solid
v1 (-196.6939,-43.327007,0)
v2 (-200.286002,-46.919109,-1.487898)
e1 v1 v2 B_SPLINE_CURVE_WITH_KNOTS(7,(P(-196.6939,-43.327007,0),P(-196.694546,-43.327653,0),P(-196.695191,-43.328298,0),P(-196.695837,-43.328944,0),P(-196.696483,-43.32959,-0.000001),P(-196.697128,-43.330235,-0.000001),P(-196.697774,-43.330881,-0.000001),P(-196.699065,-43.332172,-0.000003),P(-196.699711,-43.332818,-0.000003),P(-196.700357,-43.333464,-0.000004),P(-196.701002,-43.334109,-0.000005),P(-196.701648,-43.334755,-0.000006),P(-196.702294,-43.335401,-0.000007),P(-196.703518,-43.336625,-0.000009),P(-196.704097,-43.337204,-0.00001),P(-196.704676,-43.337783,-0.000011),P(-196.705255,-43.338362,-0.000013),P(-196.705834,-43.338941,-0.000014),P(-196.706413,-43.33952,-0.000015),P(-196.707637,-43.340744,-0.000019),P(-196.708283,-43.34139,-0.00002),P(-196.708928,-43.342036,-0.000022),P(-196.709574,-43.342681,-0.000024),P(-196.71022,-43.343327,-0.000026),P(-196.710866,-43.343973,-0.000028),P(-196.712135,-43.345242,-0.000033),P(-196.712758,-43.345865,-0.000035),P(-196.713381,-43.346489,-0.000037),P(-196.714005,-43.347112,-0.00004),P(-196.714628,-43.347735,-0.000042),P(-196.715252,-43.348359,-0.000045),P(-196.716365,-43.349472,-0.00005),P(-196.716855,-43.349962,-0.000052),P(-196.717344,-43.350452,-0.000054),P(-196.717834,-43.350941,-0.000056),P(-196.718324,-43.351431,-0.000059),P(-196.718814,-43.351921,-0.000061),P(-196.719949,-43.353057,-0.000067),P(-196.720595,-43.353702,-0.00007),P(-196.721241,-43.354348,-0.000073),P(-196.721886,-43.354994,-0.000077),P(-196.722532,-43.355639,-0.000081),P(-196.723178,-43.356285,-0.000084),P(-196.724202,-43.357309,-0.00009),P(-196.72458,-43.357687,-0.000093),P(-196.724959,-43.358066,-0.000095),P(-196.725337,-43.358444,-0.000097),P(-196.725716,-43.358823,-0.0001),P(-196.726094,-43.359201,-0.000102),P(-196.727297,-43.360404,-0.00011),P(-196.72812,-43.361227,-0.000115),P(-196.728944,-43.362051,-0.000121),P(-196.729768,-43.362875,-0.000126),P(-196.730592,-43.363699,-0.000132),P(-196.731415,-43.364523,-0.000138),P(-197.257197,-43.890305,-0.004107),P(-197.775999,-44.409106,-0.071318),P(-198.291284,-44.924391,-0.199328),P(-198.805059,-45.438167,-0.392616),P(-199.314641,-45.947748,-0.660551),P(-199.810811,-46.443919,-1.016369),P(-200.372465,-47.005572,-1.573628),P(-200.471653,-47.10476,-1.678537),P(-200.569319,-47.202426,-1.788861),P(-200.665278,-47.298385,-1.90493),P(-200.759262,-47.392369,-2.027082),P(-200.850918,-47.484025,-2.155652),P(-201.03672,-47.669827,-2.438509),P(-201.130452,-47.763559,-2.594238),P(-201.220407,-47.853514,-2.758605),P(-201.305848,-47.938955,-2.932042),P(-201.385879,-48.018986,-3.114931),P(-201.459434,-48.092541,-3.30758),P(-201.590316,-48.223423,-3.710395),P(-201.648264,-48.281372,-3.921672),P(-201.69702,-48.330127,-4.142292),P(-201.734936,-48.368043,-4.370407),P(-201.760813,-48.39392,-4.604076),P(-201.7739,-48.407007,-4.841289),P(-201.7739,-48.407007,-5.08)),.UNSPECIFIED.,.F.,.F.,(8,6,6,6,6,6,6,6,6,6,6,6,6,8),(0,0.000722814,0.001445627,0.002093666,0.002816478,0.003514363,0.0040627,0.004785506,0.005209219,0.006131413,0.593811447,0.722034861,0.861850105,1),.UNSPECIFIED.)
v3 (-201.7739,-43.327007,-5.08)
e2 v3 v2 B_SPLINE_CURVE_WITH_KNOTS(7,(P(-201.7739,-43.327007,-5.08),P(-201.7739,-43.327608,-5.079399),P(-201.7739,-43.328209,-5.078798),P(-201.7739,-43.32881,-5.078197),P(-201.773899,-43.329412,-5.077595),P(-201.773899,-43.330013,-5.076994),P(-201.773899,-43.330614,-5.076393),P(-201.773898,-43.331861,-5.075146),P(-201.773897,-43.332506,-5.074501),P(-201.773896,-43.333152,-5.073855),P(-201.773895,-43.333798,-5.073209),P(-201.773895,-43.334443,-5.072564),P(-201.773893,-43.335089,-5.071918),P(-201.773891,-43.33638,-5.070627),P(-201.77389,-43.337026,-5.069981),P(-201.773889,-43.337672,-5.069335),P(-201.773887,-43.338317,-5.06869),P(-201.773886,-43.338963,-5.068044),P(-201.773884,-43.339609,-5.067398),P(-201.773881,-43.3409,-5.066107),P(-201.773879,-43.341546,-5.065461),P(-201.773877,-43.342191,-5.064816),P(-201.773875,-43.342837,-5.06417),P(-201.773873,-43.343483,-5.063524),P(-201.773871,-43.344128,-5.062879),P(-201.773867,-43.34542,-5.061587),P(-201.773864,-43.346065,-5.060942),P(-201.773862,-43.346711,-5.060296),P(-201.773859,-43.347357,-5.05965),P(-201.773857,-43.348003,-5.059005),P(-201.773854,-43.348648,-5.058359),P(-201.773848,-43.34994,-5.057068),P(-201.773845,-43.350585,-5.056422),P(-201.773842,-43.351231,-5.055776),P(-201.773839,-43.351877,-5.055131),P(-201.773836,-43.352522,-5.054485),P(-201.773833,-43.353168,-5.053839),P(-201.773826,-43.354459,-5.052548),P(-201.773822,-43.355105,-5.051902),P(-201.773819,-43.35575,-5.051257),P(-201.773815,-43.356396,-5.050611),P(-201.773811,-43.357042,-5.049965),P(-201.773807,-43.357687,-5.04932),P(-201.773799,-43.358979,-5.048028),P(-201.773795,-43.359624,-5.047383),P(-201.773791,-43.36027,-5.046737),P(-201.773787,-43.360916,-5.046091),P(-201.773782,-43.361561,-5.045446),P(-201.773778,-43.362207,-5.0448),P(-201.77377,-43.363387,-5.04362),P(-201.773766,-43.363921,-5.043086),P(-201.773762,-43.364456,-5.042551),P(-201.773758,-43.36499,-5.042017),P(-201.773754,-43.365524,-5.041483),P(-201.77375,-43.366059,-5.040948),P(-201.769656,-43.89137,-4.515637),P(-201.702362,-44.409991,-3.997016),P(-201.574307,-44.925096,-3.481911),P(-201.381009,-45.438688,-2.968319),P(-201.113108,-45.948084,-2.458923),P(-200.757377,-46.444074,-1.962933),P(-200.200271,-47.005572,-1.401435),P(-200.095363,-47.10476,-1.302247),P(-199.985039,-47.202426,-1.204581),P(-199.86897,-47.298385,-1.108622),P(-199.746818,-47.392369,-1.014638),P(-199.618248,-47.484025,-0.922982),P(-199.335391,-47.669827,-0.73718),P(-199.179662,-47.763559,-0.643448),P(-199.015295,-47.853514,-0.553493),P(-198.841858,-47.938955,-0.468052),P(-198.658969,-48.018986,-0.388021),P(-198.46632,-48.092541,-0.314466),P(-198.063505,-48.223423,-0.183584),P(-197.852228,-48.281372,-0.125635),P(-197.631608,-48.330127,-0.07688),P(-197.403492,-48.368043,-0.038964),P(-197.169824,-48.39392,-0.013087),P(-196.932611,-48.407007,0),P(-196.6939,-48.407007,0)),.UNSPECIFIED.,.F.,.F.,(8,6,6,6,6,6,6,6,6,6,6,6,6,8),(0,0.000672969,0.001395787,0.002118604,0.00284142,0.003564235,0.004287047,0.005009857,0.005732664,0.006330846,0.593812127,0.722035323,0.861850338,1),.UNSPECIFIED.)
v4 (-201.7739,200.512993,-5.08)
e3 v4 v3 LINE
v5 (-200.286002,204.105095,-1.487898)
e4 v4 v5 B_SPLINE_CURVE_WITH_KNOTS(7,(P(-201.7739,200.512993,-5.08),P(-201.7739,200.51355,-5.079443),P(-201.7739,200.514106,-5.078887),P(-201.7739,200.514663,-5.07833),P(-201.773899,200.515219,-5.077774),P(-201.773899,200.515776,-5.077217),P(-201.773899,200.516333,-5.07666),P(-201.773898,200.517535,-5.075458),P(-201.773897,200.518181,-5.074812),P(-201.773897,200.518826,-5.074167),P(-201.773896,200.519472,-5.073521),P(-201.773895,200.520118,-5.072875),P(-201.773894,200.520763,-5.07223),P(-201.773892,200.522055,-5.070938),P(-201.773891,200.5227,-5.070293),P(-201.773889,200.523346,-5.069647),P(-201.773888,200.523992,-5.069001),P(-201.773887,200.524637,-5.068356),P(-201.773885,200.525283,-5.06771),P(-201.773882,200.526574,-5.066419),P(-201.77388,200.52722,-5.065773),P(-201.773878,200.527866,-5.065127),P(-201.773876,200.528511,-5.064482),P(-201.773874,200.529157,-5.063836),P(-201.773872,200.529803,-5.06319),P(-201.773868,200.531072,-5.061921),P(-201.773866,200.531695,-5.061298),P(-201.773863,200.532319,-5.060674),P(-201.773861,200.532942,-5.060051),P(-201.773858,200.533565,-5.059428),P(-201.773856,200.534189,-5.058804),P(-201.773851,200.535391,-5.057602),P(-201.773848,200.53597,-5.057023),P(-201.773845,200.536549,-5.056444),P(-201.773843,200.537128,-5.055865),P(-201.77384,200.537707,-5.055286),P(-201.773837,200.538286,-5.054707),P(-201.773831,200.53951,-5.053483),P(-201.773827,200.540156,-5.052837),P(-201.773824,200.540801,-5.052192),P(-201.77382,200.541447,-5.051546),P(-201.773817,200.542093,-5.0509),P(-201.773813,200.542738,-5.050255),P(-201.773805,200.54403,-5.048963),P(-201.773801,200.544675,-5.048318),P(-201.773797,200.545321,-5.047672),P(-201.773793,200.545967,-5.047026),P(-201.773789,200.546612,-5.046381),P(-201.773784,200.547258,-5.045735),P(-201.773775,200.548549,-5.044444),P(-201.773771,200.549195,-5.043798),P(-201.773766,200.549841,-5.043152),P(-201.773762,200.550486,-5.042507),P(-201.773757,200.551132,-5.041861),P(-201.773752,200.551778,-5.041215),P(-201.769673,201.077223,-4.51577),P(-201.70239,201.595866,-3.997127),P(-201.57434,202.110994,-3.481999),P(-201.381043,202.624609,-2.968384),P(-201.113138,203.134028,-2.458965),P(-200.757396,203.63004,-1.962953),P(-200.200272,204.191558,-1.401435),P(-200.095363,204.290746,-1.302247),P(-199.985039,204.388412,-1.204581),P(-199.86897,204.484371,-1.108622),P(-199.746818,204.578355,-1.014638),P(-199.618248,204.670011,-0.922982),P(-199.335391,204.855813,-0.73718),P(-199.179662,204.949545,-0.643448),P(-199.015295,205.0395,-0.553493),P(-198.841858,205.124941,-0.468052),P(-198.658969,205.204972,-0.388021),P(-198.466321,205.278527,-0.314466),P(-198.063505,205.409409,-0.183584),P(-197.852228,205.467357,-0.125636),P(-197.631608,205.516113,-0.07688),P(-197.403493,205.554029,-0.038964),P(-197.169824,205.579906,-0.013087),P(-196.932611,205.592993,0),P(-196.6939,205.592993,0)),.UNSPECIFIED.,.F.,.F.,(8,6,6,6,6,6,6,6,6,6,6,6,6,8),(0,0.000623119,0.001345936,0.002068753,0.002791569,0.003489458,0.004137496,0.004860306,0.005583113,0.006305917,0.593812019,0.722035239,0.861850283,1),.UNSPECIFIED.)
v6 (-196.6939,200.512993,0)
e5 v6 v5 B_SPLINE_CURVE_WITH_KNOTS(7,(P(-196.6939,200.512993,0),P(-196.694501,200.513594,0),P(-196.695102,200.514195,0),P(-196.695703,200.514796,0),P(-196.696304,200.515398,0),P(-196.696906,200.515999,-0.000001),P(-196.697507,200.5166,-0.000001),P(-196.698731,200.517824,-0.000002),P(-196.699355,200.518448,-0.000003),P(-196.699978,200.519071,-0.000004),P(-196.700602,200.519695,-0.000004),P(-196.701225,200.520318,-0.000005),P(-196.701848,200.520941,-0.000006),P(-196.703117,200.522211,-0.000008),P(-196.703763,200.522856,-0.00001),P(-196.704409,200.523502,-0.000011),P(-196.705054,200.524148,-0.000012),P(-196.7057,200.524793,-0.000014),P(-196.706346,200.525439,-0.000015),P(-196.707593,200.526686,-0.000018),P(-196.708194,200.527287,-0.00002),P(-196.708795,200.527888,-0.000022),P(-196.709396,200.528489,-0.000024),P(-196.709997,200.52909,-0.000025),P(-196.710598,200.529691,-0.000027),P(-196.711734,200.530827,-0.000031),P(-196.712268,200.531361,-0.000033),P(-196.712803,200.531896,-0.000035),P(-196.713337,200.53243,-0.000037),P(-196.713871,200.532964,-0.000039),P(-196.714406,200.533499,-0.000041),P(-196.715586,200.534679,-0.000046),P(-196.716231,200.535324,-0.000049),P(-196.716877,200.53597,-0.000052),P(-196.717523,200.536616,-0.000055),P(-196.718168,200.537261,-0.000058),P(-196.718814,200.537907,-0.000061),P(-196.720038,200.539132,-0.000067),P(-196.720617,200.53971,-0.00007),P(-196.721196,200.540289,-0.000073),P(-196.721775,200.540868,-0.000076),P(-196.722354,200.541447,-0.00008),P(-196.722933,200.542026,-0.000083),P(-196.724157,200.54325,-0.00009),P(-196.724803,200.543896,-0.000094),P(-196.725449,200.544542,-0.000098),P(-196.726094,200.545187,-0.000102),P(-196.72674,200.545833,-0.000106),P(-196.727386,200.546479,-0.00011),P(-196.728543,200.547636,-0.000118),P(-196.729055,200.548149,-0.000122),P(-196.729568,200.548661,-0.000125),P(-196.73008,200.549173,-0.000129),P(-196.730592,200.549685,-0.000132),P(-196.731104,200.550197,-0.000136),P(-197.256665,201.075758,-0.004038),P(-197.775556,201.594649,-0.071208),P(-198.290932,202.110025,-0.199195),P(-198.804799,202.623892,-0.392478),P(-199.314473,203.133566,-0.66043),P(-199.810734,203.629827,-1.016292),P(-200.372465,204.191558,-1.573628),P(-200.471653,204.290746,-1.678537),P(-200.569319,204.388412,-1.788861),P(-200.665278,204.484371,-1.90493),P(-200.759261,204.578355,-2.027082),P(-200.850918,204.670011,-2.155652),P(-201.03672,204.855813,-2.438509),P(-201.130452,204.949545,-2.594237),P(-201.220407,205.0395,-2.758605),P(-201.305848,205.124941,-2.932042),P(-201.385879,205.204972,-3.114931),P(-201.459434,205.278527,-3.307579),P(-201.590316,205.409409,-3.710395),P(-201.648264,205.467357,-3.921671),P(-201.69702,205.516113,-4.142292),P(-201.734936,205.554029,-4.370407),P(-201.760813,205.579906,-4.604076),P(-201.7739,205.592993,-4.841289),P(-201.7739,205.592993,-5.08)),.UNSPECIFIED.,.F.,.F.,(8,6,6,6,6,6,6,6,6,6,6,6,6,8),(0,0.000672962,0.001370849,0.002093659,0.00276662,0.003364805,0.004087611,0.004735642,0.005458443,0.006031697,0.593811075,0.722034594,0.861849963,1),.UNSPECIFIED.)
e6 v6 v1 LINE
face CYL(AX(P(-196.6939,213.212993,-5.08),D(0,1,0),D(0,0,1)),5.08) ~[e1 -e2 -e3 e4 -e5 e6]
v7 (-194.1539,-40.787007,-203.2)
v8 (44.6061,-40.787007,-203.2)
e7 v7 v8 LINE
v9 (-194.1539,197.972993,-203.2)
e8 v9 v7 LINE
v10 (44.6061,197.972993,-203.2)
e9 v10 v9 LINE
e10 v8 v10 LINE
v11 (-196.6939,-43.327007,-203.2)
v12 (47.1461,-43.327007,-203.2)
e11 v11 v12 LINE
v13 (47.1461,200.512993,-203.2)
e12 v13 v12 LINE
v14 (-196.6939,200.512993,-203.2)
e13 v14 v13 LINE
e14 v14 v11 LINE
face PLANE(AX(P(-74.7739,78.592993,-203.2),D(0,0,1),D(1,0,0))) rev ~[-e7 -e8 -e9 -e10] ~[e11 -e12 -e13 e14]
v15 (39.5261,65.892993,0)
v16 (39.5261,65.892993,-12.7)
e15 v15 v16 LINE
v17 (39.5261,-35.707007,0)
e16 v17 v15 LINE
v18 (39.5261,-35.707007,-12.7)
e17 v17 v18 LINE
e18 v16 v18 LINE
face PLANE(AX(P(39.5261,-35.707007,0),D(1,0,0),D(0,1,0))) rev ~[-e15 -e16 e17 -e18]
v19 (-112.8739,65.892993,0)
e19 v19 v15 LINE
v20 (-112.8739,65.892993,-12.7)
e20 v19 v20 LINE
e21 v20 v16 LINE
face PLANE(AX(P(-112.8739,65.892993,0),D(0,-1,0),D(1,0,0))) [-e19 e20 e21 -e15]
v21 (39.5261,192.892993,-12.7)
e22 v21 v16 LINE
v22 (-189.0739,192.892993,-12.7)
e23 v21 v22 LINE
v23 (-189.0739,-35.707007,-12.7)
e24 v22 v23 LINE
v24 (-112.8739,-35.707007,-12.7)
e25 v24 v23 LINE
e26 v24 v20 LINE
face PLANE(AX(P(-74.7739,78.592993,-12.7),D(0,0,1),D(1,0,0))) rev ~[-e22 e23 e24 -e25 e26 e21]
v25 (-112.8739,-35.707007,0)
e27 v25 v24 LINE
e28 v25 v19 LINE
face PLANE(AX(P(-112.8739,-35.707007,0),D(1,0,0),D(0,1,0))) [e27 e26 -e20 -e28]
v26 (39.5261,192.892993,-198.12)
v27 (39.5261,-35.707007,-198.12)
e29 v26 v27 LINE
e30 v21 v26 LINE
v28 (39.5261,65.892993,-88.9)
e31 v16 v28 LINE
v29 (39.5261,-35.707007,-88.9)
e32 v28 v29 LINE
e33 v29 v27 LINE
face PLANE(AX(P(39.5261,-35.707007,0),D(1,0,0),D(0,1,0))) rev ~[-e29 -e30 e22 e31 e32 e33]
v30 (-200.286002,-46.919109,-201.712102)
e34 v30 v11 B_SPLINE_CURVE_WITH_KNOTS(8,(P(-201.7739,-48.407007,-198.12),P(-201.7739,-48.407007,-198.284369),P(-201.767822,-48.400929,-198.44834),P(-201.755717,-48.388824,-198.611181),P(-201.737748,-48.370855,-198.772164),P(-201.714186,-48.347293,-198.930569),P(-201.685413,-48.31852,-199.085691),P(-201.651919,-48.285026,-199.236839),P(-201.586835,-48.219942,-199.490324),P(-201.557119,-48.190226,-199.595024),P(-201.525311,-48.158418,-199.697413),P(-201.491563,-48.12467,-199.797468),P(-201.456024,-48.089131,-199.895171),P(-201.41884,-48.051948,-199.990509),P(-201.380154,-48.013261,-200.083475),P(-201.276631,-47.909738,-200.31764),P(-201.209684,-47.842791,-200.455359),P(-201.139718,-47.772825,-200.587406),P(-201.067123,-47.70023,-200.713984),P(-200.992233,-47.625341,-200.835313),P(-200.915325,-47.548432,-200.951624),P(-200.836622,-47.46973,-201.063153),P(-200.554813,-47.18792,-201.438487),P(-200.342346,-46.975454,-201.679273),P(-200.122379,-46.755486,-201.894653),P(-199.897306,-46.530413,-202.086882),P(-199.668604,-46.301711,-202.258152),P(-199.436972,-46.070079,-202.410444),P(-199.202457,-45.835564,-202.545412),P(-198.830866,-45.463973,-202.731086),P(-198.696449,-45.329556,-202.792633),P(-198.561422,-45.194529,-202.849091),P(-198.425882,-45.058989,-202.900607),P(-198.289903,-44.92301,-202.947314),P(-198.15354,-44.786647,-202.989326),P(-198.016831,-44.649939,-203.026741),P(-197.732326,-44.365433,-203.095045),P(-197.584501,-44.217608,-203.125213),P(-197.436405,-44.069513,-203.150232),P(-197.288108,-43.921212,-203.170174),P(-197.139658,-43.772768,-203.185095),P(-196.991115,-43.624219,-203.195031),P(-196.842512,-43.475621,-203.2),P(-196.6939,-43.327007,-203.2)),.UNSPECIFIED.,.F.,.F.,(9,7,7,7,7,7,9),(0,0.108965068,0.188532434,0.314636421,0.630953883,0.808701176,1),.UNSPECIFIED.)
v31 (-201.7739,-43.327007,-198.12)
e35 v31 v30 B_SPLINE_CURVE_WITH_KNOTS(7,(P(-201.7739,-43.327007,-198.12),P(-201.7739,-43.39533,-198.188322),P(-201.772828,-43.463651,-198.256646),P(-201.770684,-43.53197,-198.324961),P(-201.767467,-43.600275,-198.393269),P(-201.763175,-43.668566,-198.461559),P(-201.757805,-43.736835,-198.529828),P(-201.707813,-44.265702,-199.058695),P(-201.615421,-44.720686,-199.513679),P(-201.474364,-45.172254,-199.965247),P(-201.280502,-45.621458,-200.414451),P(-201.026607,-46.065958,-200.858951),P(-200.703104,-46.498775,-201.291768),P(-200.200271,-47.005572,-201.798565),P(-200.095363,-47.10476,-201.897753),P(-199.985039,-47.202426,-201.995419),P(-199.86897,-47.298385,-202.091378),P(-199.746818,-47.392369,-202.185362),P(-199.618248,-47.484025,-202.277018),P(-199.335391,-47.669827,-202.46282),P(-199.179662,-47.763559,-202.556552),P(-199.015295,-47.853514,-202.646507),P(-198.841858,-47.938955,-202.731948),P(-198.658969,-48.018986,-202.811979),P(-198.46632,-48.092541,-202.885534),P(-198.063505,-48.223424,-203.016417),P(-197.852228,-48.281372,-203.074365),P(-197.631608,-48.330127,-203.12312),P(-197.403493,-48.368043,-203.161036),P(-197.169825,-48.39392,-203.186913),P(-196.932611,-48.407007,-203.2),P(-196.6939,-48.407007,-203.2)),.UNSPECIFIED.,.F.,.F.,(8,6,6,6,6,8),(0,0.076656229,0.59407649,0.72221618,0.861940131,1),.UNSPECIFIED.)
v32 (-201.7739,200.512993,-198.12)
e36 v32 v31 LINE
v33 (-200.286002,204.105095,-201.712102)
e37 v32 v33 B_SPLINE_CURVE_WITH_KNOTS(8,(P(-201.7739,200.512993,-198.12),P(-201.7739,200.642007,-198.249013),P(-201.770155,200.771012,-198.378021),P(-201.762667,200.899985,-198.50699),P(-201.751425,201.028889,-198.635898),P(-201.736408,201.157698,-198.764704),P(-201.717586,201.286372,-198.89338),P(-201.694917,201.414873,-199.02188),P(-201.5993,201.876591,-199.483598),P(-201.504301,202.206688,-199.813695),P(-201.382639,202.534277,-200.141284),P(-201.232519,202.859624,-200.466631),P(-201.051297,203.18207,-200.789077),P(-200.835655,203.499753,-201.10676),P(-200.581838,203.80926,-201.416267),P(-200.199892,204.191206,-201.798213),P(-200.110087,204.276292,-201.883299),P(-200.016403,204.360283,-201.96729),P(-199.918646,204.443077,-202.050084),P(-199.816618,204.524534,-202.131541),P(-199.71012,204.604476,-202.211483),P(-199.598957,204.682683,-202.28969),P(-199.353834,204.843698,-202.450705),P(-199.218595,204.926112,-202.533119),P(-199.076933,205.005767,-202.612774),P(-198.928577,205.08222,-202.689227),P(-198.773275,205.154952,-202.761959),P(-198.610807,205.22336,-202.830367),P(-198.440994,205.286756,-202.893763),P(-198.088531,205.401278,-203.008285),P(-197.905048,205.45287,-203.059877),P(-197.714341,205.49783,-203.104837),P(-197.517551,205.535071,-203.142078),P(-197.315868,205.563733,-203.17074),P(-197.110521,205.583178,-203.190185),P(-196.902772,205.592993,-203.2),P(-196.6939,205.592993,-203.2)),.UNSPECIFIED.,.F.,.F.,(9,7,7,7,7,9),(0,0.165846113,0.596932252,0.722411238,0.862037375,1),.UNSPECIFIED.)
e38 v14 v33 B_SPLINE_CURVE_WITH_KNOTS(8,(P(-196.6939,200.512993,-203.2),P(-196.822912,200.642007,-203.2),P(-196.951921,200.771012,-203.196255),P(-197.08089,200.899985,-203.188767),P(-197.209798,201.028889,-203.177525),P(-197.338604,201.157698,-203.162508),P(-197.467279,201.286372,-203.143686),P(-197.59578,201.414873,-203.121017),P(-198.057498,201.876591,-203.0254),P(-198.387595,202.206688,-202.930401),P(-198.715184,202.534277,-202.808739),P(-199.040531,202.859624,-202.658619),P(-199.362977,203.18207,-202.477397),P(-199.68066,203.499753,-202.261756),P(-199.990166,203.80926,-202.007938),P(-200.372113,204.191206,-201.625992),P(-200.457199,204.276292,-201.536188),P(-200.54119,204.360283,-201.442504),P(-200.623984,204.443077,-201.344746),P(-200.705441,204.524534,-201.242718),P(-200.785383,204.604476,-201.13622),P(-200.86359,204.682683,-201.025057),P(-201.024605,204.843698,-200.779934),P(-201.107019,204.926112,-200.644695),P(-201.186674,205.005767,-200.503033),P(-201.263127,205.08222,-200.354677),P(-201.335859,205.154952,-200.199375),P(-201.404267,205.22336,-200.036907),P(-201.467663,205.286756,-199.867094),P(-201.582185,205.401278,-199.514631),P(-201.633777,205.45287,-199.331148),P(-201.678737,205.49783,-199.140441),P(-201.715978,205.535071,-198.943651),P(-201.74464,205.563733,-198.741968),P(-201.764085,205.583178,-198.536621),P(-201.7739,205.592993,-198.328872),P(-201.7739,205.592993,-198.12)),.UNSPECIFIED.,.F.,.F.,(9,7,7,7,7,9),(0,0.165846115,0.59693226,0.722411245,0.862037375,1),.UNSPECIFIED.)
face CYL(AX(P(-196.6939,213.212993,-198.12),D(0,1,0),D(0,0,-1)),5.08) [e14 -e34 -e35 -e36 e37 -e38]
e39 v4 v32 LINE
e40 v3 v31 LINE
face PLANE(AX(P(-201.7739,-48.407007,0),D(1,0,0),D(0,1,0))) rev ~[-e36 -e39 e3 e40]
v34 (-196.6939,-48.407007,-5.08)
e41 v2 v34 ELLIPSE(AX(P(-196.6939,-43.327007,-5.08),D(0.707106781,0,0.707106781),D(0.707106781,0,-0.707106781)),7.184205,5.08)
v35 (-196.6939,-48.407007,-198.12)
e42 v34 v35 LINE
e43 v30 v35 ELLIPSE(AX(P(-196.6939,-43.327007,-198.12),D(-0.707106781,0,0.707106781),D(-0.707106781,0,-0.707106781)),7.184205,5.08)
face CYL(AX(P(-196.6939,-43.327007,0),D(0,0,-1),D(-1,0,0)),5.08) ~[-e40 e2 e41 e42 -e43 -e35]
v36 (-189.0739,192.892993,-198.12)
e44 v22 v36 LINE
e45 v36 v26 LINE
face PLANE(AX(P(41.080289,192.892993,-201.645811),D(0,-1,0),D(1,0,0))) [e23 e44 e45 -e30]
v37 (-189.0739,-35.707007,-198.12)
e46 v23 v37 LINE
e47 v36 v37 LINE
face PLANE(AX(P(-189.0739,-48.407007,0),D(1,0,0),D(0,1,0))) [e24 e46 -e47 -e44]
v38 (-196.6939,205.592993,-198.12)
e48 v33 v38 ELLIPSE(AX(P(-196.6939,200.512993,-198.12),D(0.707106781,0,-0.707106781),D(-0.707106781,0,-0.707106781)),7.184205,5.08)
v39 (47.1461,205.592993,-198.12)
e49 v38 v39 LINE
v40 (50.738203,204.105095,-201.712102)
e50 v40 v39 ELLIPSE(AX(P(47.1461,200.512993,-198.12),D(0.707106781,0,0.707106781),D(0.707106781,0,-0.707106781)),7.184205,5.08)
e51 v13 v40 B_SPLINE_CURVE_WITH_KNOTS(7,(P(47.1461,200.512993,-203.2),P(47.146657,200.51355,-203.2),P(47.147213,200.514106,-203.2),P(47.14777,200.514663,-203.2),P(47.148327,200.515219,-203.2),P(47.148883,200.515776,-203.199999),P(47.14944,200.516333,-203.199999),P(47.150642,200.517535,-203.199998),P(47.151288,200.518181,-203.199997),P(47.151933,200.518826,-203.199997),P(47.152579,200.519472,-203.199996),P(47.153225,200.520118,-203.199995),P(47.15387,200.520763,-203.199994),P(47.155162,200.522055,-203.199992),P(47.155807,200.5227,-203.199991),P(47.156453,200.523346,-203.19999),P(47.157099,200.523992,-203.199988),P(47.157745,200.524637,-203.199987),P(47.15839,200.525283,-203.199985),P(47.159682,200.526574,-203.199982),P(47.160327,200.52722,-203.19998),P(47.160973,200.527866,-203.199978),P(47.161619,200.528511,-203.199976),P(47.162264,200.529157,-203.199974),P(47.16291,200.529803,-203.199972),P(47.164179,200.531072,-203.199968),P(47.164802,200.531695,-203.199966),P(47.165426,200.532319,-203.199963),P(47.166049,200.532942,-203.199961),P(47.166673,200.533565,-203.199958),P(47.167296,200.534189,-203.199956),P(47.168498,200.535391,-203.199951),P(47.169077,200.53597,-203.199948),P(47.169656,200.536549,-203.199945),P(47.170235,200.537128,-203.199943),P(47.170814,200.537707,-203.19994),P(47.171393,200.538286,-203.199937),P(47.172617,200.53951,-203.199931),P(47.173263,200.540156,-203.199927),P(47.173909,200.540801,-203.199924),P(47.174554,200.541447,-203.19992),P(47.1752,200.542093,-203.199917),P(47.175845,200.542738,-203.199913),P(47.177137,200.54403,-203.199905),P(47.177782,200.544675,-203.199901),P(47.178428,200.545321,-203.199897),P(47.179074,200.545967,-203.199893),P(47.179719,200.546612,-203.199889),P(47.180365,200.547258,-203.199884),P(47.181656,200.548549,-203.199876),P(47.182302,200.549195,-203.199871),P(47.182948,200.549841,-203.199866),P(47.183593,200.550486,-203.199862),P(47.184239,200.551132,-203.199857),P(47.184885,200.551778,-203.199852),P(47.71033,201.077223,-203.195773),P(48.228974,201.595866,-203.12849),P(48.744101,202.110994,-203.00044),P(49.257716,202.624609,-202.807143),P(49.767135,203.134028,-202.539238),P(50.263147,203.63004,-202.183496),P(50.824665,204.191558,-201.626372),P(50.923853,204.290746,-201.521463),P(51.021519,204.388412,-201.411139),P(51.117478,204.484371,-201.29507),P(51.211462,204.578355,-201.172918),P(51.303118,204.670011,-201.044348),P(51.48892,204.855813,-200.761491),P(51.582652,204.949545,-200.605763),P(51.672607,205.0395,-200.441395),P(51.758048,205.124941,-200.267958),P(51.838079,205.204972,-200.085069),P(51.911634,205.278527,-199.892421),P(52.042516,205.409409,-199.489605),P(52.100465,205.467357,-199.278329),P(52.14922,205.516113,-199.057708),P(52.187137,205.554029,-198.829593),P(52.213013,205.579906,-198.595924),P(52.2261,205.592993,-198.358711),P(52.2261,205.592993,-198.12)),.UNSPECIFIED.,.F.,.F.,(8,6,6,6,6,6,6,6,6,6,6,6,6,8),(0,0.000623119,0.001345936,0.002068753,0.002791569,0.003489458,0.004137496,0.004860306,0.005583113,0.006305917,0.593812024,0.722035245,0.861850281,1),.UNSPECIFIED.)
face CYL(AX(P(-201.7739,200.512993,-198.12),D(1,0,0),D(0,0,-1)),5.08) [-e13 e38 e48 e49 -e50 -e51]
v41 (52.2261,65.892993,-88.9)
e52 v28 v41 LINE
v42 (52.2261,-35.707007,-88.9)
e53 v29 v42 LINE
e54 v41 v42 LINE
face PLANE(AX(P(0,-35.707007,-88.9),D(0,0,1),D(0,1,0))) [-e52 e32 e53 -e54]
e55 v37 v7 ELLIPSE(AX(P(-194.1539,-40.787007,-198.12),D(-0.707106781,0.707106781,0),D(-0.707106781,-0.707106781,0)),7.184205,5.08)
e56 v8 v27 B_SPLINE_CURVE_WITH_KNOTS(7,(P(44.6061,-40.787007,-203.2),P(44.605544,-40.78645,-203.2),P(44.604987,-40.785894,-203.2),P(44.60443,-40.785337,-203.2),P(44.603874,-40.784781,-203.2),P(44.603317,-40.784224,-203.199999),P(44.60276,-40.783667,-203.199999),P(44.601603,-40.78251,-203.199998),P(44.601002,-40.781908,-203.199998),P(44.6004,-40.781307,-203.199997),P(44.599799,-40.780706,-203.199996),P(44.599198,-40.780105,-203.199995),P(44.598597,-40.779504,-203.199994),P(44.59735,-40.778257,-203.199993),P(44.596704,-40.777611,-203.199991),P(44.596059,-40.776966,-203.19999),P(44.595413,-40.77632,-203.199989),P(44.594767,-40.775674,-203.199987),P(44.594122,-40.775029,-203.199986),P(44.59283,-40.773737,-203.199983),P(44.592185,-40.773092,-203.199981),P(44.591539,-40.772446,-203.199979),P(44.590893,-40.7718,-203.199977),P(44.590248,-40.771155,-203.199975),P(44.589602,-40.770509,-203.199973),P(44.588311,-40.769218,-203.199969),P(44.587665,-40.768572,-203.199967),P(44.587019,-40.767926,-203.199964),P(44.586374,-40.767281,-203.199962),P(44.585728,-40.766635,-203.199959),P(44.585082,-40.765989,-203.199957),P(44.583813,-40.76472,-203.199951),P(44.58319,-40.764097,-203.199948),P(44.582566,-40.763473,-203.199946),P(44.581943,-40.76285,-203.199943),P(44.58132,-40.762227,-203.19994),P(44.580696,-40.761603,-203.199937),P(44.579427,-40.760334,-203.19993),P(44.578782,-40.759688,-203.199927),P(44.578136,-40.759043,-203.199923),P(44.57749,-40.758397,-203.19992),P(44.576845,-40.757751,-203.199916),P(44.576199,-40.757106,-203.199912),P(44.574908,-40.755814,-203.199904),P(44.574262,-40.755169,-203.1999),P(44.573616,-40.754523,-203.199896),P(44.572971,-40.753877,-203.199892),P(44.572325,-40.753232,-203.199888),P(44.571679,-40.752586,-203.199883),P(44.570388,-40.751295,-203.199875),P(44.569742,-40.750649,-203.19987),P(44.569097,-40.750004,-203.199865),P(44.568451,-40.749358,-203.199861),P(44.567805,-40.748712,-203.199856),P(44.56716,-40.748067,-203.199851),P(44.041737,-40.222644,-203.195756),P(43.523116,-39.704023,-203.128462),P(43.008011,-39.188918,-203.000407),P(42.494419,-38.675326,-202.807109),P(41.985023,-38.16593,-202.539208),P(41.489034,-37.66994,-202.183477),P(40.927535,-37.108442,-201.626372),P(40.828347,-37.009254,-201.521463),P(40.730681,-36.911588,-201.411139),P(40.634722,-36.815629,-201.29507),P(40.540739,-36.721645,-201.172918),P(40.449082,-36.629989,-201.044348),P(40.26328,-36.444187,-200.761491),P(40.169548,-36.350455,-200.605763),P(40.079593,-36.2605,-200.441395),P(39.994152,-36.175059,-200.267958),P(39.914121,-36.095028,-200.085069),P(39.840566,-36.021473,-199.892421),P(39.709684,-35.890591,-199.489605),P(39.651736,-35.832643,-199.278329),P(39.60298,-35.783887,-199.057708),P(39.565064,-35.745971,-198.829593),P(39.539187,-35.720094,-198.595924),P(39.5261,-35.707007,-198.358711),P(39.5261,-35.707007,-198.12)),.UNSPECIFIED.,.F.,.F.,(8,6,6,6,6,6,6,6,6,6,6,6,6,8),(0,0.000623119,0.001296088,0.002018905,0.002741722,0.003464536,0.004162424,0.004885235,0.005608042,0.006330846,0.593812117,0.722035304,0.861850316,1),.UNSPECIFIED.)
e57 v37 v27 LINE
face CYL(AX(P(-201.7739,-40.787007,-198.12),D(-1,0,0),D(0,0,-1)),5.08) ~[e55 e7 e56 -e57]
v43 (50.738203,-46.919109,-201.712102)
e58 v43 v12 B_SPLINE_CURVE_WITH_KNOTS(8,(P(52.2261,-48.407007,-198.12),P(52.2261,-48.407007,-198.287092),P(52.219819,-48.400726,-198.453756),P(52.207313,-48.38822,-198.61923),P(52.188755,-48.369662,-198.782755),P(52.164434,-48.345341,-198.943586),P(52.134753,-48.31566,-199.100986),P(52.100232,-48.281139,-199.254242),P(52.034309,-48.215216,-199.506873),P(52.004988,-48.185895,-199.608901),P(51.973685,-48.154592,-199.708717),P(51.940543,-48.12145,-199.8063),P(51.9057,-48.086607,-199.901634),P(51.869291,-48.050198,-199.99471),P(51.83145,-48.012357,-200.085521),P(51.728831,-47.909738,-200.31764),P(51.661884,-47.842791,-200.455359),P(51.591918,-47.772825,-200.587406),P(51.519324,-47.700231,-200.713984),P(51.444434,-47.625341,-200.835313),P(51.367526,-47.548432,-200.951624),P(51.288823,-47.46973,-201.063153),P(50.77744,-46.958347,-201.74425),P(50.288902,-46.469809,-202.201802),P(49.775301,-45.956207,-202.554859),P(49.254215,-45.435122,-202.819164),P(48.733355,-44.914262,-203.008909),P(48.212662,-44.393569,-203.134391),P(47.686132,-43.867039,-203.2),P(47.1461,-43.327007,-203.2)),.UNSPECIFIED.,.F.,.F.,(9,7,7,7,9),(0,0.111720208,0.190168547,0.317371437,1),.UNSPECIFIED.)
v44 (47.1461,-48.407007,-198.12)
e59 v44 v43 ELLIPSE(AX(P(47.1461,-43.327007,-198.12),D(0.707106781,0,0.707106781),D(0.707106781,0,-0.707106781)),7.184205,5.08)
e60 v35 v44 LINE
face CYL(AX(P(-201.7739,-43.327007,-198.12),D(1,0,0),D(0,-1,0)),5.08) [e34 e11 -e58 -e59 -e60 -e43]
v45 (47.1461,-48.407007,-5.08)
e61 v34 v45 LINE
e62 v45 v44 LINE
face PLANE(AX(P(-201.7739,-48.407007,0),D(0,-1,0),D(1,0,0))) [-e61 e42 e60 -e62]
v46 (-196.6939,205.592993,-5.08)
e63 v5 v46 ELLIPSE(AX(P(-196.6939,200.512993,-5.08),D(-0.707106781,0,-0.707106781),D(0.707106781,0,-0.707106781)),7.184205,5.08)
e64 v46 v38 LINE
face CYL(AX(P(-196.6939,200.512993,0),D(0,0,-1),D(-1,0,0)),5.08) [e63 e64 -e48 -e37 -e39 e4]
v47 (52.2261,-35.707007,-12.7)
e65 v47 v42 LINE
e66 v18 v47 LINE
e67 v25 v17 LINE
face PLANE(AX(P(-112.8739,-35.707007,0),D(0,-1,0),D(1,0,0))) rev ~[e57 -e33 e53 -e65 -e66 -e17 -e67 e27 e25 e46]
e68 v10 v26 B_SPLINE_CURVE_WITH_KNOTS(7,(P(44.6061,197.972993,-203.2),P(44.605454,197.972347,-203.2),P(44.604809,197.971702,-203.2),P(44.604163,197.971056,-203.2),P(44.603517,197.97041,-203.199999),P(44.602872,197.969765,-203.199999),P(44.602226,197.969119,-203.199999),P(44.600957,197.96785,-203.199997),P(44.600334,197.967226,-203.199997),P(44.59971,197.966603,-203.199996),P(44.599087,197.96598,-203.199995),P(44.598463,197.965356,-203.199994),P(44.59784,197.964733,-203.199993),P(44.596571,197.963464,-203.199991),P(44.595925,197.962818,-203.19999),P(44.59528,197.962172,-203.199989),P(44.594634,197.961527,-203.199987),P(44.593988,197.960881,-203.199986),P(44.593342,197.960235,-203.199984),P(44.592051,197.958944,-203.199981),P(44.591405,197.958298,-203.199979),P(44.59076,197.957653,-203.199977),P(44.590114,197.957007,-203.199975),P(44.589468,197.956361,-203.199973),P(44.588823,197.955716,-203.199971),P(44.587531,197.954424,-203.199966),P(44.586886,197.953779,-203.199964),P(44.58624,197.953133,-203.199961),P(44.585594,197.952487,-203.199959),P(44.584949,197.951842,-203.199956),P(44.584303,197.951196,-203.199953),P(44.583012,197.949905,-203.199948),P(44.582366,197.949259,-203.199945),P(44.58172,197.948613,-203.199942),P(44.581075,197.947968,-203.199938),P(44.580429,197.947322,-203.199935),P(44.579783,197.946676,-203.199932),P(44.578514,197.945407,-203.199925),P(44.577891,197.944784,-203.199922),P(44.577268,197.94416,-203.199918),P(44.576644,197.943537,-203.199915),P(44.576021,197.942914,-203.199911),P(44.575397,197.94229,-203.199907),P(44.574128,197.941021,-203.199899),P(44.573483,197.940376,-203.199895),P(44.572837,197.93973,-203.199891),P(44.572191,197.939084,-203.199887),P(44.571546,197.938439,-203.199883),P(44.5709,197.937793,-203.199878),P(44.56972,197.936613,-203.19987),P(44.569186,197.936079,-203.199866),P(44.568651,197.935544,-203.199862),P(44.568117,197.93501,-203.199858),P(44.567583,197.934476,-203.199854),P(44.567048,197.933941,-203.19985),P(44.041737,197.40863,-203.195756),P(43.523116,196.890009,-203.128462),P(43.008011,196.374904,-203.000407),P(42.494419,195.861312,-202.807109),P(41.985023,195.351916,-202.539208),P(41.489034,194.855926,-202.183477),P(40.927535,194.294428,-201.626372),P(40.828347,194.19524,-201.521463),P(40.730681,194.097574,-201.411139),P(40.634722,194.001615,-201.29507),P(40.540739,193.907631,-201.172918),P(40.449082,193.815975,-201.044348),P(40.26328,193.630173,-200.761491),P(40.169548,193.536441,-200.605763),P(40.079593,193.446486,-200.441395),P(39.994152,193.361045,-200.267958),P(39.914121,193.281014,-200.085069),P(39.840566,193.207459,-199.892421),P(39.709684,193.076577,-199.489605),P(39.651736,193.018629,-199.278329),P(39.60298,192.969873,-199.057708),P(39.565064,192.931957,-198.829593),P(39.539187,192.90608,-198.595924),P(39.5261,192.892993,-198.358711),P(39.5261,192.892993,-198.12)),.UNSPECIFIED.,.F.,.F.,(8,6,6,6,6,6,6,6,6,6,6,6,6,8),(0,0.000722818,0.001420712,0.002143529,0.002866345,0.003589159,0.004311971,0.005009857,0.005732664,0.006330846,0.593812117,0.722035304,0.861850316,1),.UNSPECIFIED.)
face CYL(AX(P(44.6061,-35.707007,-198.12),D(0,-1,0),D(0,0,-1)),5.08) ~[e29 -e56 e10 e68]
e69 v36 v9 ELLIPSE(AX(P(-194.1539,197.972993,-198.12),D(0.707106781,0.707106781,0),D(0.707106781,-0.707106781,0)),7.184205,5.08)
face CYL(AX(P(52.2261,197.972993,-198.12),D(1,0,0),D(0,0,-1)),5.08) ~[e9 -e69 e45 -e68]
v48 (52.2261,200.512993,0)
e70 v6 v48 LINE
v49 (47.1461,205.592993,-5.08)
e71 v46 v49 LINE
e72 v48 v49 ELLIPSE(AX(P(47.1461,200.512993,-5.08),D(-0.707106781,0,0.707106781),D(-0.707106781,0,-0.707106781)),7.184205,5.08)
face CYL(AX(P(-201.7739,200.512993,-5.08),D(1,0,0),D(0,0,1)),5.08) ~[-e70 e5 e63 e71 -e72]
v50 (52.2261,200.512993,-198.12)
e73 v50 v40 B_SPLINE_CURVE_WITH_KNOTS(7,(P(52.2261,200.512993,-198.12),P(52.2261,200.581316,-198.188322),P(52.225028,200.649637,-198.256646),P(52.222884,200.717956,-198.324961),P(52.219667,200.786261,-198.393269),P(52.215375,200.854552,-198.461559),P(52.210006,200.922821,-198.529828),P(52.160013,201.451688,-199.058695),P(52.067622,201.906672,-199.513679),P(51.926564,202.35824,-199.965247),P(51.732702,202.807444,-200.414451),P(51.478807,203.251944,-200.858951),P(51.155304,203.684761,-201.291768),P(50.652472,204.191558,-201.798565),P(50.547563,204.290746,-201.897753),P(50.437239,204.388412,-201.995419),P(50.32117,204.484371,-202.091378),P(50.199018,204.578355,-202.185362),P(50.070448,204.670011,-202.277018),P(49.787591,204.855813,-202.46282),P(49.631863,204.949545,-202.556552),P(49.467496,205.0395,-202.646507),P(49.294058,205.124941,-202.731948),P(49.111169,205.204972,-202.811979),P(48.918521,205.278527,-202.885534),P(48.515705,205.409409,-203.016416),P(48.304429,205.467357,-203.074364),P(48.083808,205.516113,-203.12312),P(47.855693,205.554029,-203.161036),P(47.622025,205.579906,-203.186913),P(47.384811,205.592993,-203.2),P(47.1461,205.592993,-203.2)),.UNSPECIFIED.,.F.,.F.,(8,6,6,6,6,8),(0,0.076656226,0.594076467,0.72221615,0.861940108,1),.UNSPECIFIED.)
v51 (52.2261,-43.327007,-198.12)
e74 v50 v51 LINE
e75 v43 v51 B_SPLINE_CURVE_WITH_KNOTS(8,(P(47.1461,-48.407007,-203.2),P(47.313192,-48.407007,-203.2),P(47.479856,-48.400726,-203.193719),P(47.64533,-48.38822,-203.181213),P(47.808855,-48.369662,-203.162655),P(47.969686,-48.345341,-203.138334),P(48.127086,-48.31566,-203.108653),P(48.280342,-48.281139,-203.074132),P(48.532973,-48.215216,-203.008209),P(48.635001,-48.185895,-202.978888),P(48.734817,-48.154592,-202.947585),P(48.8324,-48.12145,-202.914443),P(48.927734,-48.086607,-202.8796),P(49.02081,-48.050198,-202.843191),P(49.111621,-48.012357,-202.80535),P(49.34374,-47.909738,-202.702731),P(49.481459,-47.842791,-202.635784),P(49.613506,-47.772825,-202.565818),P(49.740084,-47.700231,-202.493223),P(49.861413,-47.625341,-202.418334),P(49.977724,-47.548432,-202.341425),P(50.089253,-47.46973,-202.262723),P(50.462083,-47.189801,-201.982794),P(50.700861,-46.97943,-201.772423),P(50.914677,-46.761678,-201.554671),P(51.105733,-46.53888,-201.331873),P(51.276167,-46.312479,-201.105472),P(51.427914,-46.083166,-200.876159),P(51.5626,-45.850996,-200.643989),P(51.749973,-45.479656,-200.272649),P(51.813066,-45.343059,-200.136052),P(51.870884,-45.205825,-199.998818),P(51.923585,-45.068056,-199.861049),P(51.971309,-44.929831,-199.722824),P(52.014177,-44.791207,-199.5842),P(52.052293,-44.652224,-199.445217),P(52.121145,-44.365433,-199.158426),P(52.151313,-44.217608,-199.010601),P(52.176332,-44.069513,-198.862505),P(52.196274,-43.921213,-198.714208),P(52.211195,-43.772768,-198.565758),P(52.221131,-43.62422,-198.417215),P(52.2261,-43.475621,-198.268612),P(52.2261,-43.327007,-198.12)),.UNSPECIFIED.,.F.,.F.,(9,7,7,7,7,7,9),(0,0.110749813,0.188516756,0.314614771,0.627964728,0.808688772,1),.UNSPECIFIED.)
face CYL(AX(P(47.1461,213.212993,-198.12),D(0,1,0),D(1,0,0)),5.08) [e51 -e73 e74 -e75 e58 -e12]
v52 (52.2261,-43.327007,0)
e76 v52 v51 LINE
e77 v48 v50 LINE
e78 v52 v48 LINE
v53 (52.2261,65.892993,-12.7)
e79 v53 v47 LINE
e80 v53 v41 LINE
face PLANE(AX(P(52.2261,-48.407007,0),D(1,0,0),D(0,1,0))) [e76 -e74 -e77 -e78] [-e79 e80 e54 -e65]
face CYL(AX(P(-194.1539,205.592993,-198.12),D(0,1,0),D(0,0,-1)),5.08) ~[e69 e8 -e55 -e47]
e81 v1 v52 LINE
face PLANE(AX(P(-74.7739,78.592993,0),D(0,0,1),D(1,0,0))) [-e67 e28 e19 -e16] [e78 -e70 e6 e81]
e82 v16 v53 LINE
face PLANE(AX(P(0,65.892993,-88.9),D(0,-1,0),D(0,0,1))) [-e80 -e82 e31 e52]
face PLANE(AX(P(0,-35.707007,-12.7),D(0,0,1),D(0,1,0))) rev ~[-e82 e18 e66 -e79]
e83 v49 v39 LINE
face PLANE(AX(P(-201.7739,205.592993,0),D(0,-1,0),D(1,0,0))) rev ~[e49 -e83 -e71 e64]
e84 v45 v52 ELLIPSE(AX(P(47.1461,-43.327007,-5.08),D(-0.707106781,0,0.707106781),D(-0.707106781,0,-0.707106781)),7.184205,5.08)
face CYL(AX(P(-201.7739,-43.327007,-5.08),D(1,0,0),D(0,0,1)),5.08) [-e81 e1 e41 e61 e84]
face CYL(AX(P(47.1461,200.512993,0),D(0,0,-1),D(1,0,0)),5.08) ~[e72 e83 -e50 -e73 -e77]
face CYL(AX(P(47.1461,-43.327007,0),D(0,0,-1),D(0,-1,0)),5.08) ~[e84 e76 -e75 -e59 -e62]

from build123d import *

# Parameters (mm, degrees)
F0_W          = 254
F0_H          = 254
F0_W_2        = 228.6
F0_H_2        = 228.6
F1_DEPTH      = 203.2
F2_T          = -12.7
F3_W          = 152.4
F3_H          = 101.6
F4_DEPTH      = 12.7
F5_W          = 101.6
F5_H          = 76.2
F6_DEPTH      = 76.2
F7_R          = 5.08
F8_R          = 5.08
F9_T1_DEPTH   = 269.24
F10_T1_DEPTH  = 269.24
F10_T3_DEPTH  = 228.6
F10_T5_DEPTH  = 228.6
F10_T11_DEPTH = 241.3
F10_T15_DEPTH = 241.3
F10_T22_DEPTH = 241.3
F10_T26_DEPTH = 241.3
F10_T33_DEPTH = 241.3
F10_T37_DEPTH = 241.3
F10_T44_DEPTH = 241.3
F10_T48_DEPTH = 241.3


# Not quite as in the source:
# - a fillet or chamfer that OpenCascade refuses, or shapes differently, is made with other operations: its cross-section is extruded or revolved along the edge and cut away or added


with BuildPart() as f1:
    # F0 (on Top) → F1 (new body)
    with BuildSketch(Plane.XY):
        with Locations((-74.773899883, 78.5929929912)):
            Rectangle(F0_W, F0_H)
        with Locations((-74.773899883, 78.5929929912)):
            Rectangle(F0_W_2, F0_H_2, mode=Mode.SUBTRACT)
        with Locations((-74.773899883, 78.5929929912)):
            Rectangle(F0_W_2, F0_H_2)
    extrude(amount=-F1_DEPTH)

    # F2
    f2_openings = [f1.faces().sort_by_distance(p)[0] for p in [
        (-74.7739, 78.592993, -203.2),
    ]]
    offset(amount=F2_T, openings=f2_openings)

    # F3 (on Top) → F4 (cut)
    with BuildSketch(Plane.XY):
        with Locations((-36.673899883, 15.0929929912)):
            Rectangle(F3_W, F3_H)
    extrude(amount=-F4_DEPTH, mode=Mode.SUBTRACT)

    # F5 (on Right) → F6 (cut)
    with BuildSketch(Plane.YZ):
        with Locations((15.0929929912, -50.8)):
            Rectangle(F5_W, F5_H)
    extrude(amount=F6_DEPTH, mode=Mode.SUBTRACT)

    # F7
    f7_edges = [f1.edges().sort_by_distance(p)[0] for p in [
        (52.2261, 205.592993, -101.6),
        (-201.7739, 205.592993, -101.6),
        (-74.7739, 205.592993, 0),
        (-74.7739, 205.592993, -203.2),
    ]]
    fillet(f7_edges, radius=F7_R)

    # F8
    f8_edges = [f1.edges().sort_by_distance(p)[0] for p in [
        (-201.7739, -48.407007, -101.6),
        (52.2261, -48.407007, -101.6),
        (-74.7739, -48.407007, 0),
        (-74.7739, -48.407007, -203.2),
    ]]
    fillet(f8_edges, radius=F8_R)

    # F9: fillet of radius 5.08 on 4 edges, made by hand

    # F9_s2 → F9_t1 (cut)
    with BuildSketch(Plane.XZ.offset(-213.2129929912)):
        with BuildLine():
            ThreePointArc((-196.693899883, 0), (-200.2860023315, -1.4878975516), (-201.773899883, -5.08))
            Line((-201.773899883, -5.08), (-201.773899883, 0))
            Line((-201.773899883, 0), (-196.693899883, 0))
        make_face()
        with BuildLine():
            ThreePointArc((-196.693899883, -203.2), (-200.2860023315, -201.7121024484), (-201.773899883, -198.12))
            Line((-201.773899883, -198.12), (-201.773899883, -203.2))
            Line((-201.773899883, -203.2), (-196.693899883, -203.2))
        make_face()
    extrude(amount=F9_T1_DEPTH, mode=Mode.SUBTRACT)

    # F10: fillet of radius 5.08 on 8 edges, made by hand

    # F10_s2 → F10_t1 (cut)
    with BuildSketch(Plane.XZ.offset(-213.2129929912)):
        with BuildLine():
            ThreePointArc((52.226100117, -198.12), (50.7382025654, -201.7121024484), (47.146100117, -203.2))
            Line((47.146100117, -203.2), (52.226100117, -203.2))
            Line((52.226100117, -203.2), (52.226100117, -198.12))
        make_face()
    extrude(amount=F10_T1_DEPTH, mode=Mode.SUBTRACT)

    # F10_s4 → F10_t3 (cut)
    with BuildSketch(Plane.XZ.offset(-192.8929929912)):
        with BuildLine():
            ThreePointArc((44.606100117, -203.2), (41.0139976685, -201.7121024484), (39.526100117, -198.12))
            Line((39.526100117, -198.12), (39.526100117, -203.2))
            Line((39.526100117, -203.2), (44.606100117, -203.2))
        make_face()
        with BuildLine():
            ThreePointArc((-194.153899883, -203.2), (-190.5617974346, -201.7121024484), (-189.073899883, -198.12))
            Line((-189.073899883, -198.12), (-189.073899883, -203.2))
            Line((-189.073899883, -203.2), (-194.153899883, -203.2))
        make_face()
    extrude(amount=F10_T3_DEPTH, mode=Mode.SUBTRACT)

    # F10_s6 → F10_t5 (cut)
    with BuildSketch(Plane.YZ.offset(-189.073899883)):
        with BuildLine():
            ThreePointArc((-40.7870070088, -203.2), (-37.1949045604, -201.7121024484), (-35.7070070088, -198.12))
            Line((-35.7070070088, -198.12), (-35.7070070088, -203.2))
            Line((-35.7070070088, -203.2), (-40.7870070088, -203.2))
        make_face()
        with BuildLine():
            ThreePointArc((197.9729929912, -203.2), (194.3808905428, -201.7121024484), (192.8929929912, -198.12))
            Line((192.8929929912, -198.12), (192.8929929912, -203.2))
            Line((192.8929929912, -203.2), (197.9729929912, -203.2))
        make_face()
    extrude(amount=F10_T5_DEPTH, mode=Mode.SUBTRACT)


with BuildPart() as f10_tool9:
    # F10_s10 → F10_t11 (new body)
    with BuildSketch(Plane.XZ.offset(48.4070070088)):
        with BuildLine():
            ThreePointArc((44.606100117, -203.2), (41.0139976685, -201.7121024484), (39.526100117, -198.12))
            Line((39.526100117, -198.12), (39.526100117, -203.2))
            Line((39.526100117, -203.2), (44.606100117, -203.2))
        make_face()
    extrude(amount=-F10_T11_DEPTH)

    split(bisect_by=Plane.XZ.offset(35.7070070088), keep=Keep.TOP)


with BuildPart() as f10_tool13:
    # F10_s14 → F10_t15 (new body)
    with BuildSketch(Plane.YZ.offset(-189.073899883)):
        with BuildLine():
            ThreePointArc((-40.7870070088, -203.2), (-37.1949045604, -201.7121024484), (-35.7070070088, -198.12))
            Line((-35.7070070088, -198.12), (-35.7070070088, -203.2))
            Line((-35.7070070088, -203.2), (-40.7870070088, -203.2))
        make_face()
    extrude(amount=F10_T15_DEPTH)

    split(bisect_by=Plane.YZ.offset(39.526100117), keep=Keep.TOP)


with BuildPart() as f10_tool9_1:
    add(f10_tool9.part)

    # F10_t17: intersect F10_tool13
    add(f10_tool13.part, mode=Mode.INTERSECT)


with BuildPart() as f1_1:
    add(f1.part)

    # F10_t7: cut F10_tool9
    add(f10_tool9_1.part, mode=Mode.SUBTRACT)


with BuildPart() as f10_tool20:
    # F10_s21 → F10_t22 (new body)
    with BuildSketch(Plane.XZ.offset(35.7070070088)):
        with BuildLine():
            ThreePointArc((44.606100117, -203.2), (41.0139976685, -201.7121024484), (39.526100117, -198.12))
            Line((39.526100117, -198.12), (39.526100117, -203.2))
            Line((39.526100117, -203.2), (44.606100117, -203.2))
        make_face()
    extrude(amount=-F10_T22_DEPTH)

    split(bisect_by=Plane.XZ.offset(-192.8929929912), keep=Keep.BOTTOM)


with BuildPart() as f10_tool24:
    # F10_s25 → F10_t26 (new body)
    with BuildSketch(Plane.YZ.offset(52.226100117)):
        with BuildLine():
            ThreePointArc((197.9729929912, -203.2), (194.3808905428, -201.7121024484), (192.8929929912, -198.12))
            Line((192.8929929912, -198.12), (192.8929929912, -203.2))
            Line((192.8929929912, -203.2), (197.9729929912, -203.2))
        make_face()
    extrude(amount=-F10_T26_DEPTH)

    split(bisect_by=Plane.YZ.offset(39.526100117), keep=Keep.TOP)


with BuildPart() as f10_tool20_1:
    add(f10_tool20.part)

    # F10_t28: intersect F10_tool24
    add(f10_tool24.part, mode=Mode.INTERSECT)


with BuildPart() as f1_2:
    add(f1_1.part)

    # F10_t18: cut F10_tool20
    add(f10_tool20_1.part, mode=Mode.SUBTRACT)


with BuildPart() as f10_tool31:
    # F10_s32 → F10_t33 (new body)
    with BuildSketch(Plane.YZ.offset(-201.773899883)):
        with BuildLine():
            ThreePointArc((-40.7870070088, -203.2), (-37.1949045604, -201.7121024484), (-35.7070070088, -198.12))
            Line((-35.7070070088, -198.12), (-35.7070070088, -203.2))
            Line((-35.7070070088, -203.2), (-40.7870070088, -203.2))
        make_face()
    extrude(amount=F10_T33_DEPTH)

    split(bisect_by=Plane.YZ.offset(-189.073899883), keep=Keep.BOTTOM)


with BuildPart() as f10_tool35:
    # F10_s36 → F10_t37 (new body)
    with BuildSketch(Plane.XZ.offset(-192.8929929912)):
        with BuildLine():
            ThreePointArc((-194.153899883, -203.2), (-190.5617974346, -201.7121024484), (-189.073899883, -198.12))
            Line((-189.073899883, -198.12), (-189.073899883, -203.2))
            Line((-189.073899883, -203.2), (-194.153899883, -203.2))
        make_face()
    extrude(amount=F10_T37_DEPTH)

    split(bisect_by=Plane.XZ.offset(35.7070070088), keep=Keep.TOP)


with BuildPart() as f10_tool31_1:
    add(f10_tool31.part)

    # F10_t39: intersect F10_tool35
    add(f10_tool35.part, mode=Mode.INTERSECT)


with BuildPart() as f1_3:
    add(f1_2.part)

    # F10_t29: cut F10_tool31
    add(f10_tool31_1.part, mode=Mode.SUBTRACT)


with BuildPart() as f10_tool42:
    # F10_s43 → F10_t44 (new body)
    with BuildSketch(Plane.YZ.offset(39.526100117)):
        with BuildLine():
            ThreePointArc((197.9729929912, -203.2), (194.3808905428, -201.7121024484), (192.8929929912, -198.12))
            Line((192.8929929912, -198.12), (192.8929929912, -203.2))
            Line((192.8929929912, -203.2), (197.9729929912, -203.2))
        make_face()
    extrude(amount=-F10_T44_DEPTH)

    split(bisect_by=Plane.YZ.offset(-189.073899883), keep=Keep.BOTTOM)


with BuildPart() as f10_tool46:
    # F10_s47 → F10_t48 (new body)
    with BuildSketch(Plane.XZ.offset(-205.5929929912)):
        with BuildLine():
            ThreePointArc((-194.153899883, -203.2), (-190.5617974346, -201.7121024484), (-189.073899883, -198.12))
            Line((-189.073899883, -198.12), (-189.073899883, -203.2))
            Line((-189.073899883, -203.2), (-194.153899883, -203.2))
        make_face()
    extrude(amount=F10_T48_DEPTH)

    split(bisect_by=Plane.XZ.offset(-192.8929929912), keep=Keep.BOTTOM)


with BuildPart() as f10_tool42_1:
    add(f10_tool42.part)

    # F10_t50: intersect F10_tool46
    add(f10_tool46.part, mode=Mode.INTERSECT)


with BuildPart() as f1_4:
    add(f1_3.part)

    # F10_t40: cut F10_tool42
    add(f10_tool42_1.part, mode=Mode.SUBTRACT)


solid = f1_4.part
